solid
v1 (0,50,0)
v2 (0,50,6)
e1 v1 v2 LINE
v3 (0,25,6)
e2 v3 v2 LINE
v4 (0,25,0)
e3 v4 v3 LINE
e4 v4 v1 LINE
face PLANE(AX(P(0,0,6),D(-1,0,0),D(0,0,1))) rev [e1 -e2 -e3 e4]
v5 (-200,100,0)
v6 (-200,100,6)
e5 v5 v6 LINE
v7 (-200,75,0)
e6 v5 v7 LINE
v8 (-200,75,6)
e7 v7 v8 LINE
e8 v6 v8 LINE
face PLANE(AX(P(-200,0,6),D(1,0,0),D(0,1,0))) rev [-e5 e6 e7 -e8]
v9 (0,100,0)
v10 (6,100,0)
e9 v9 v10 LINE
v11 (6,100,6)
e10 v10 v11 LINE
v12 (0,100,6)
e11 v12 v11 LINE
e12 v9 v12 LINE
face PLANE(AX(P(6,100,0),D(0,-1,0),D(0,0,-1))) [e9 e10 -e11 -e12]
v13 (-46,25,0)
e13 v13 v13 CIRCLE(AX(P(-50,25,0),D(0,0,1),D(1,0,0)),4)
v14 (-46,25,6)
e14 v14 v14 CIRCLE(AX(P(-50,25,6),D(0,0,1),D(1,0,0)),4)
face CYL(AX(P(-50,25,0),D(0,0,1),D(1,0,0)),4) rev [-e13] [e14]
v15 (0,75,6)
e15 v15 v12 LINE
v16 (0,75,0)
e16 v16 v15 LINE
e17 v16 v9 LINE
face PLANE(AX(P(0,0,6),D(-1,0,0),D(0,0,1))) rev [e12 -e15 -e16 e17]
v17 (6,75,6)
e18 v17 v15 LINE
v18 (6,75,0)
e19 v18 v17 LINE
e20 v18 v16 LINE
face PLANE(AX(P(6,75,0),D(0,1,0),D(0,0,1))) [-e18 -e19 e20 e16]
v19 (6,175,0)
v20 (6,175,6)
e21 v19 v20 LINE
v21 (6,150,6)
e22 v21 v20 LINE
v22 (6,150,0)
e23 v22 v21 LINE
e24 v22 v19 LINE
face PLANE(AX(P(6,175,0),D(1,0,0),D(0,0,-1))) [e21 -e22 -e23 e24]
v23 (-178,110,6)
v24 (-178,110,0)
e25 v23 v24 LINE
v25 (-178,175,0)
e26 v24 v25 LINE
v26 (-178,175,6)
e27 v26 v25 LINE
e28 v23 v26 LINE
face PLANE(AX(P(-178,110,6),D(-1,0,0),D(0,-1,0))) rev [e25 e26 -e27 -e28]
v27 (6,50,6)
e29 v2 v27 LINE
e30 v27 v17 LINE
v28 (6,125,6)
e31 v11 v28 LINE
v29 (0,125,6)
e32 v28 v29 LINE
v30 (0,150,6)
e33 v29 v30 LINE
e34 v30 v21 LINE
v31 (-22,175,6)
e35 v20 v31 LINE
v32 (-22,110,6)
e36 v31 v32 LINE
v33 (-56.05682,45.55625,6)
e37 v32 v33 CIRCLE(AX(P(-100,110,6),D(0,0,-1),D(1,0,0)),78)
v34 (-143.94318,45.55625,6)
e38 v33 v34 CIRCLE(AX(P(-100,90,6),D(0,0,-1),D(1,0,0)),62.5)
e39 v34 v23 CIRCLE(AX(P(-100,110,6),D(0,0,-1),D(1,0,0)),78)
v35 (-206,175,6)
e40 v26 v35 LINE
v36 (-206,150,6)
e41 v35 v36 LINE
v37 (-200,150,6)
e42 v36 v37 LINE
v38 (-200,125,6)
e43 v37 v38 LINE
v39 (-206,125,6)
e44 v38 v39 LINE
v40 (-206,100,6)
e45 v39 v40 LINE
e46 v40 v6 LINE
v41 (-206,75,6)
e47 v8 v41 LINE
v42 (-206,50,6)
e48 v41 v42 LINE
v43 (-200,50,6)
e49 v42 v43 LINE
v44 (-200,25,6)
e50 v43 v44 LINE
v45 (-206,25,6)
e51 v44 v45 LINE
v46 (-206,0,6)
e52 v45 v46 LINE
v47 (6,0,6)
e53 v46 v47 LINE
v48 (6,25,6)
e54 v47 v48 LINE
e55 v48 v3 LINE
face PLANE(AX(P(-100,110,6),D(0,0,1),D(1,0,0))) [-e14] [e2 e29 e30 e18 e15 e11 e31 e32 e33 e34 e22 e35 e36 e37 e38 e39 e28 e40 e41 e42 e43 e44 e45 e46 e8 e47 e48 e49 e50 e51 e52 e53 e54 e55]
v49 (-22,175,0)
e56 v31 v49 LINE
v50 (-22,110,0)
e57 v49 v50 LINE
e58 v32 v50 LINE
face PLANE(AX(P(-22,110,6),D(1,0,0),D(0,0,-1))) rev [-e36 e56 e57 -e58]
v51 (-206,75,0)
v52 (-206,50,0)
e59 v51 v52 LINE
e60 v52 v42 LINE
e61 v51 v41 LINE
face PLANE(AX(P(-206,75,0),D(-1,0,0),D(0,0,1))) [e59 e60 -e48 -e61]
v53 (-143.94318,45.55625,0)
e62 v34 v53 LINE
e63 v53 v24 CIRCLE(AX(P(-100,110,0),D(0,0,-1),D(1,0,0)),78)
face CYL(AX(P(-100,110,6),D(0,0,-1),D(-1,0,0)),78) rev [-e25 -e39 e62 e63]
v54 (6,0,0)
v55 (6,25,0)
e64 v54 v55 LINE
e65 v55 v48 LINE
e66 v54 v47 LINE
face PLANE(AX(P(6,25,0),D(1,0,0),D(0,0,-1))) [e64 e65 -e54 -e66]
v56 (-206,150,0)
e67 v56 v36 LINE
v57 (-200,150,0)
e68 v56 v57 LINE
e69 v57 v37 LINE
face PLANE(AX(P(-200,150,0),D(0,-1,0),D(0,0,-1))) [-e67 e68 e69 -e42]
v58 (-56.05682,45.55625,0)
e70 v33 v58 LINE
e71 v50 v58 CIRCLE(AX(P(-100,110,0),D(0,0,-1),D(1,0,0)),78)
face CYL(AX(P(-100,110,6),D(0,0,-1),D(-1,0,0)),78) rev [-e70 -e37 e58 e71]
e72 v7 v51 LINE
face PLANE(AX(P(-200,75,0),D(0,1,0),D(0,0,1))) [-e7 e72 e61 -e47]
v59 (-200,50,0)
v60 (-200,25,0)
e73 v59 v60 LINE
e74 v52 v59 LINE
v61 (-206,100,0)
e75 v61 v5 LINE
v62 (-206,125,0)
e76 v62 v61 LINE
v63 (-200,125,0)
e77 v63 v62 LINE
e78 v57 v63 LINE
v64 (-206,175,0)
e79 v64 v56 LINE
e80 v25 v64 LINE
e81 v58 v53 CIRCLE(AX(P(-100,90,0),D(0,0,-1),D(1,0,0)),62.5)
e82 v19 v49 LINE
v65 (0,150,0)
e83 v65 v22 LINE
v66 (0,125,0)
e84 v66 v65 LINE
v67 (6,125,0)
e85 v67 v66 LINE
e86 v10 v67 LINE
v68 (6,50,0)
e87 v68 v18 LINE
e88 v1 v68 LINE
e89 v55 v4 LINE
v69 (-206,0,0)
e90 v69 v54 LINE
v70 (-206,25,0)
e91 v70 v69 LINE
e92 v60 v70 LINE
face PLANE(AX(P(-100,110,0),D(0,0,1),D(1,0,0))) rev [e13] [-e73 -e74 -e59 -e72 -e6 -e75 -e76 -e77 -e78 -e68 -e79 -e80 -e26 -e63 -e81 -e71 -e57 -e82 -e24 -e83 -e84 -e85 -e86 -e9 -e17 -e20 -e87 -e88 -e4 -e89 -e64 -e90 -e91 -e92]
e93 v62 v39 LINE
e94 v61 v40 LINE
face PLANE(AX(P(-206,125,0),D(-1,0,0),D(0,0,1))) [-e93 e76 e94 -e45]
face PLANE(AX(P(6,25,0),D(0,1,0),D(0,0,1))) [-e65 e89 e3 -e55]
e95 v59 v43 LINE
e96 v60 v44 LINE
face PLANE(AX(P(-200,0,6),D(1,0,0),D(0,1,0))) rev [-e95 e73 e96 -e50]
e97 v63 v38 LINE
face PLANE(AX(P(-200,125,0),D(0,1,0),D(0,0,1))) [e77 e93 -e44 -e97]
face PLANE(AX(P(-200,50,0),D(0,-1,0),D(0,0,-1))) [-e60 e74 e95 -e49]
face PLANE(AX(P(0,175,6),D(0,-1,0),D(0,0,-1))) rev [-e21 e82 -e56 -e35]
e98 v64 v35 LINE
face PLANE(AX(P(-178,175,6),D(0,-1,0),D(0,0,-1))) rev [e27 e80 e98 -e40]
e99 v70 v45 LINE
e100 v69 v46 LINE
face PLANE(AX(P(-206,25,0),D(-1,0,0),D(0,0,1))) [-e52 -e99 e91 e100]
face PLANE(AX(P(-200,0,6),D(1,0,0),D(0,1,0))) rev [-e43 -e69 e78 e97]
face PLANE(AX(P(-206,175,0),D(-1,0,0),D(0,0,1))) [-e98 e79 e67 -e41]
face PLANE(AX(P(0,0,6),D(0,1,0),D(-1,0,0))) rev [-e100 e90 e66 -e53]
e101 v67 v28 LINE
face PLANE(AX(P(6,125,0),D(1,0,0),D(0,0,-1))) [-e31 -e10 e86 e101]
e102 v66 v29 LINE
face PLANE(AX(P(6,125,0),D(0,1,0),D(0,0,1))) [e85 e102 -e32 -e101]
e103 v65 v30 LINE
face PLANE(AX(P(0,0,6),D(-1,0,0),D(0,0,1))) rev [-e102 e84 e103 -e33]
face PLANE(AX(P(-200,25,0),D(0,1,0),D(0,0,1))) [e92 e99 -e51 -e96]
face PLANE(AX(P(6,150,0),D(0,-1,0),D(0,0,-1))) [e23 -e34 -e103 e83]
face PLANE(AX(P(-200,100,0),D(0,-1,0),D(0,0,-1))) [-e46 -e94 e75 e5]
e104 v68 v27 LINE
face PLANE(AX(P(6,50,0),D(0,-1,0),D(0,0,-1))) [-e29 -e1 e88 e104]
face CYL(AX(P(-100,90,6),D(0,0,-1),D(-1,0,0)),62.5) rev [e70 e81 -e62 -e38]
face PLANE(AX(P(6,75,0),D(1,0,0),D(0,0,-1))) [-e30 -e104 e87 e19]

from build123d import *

# Parameters (mm, degrees)
BOSS_EXTRUDE1_DEPTH   = 6
SKETCH2_W             = 6
SKETCH2_H             = 25
BOSS_EXTRUDE2_DEPTH   = 6
LPATTERN1_OUTLINE_W   = 6
LPATTERN1_OUTLINE_H   = 6
LPATTERN1_DEPTH       = 25
LPATTERN1_START       = 50
LPATTERN1_2_OUTLINE_W = 6
LPATTERN1_2_OUTLINE_H = 6
LPATTERN1_2_DEPTH     = 25
LPATTERN1_START_2     = 100
LPATTERN1_3_OUTLINE_W = 6
LPATTERN1_3_OUTLINE_H = 6
LPATTERN1_3_DEPTH     = 25
LPATTERN1_START_3     = 150
LPATTERN1_4_OUTLINE_W = 6
LPATTERN1_4_OUTLINE_H = 6
LPATTERN1_4_DEPTH     = 25
SKETCH5_R             = 4
CUT_EXTRUDE1_DEPTH    = 271.364568685


# Read off the part's stored shape, not the designer's step: LPattern1
with BuildPart() as part:
    # Sketch1 → Boss-Extrude1 (new body)
    with BuildSketch(Plane.XY):
        with BuildLine():
            Line((-178, 175), (-200, 175))
            Line((-200, 175), (-200, 0))
            Line((-200, 0), (0, 0))
            Line((0, 0), (0, 175))
            Line((0, 175), (-22, 175))
            Line((-22, 175), (-22, 110))
            ThreePointArc((-22, 110), (-31.037807258, 73.555302549), (-56.056819802, 45.55625))
            ThreePointArc((-56.056819802, 45.55625), (-100, 27.5), (-143.943180198, 45.55625))
            ThreePointArc((-143.943180198, 45.55625), (-168.962192742, 73.555302549), (-178, 110))
            Line((-178, 110), (-178, 175))
        make_face()
    extrude(amount=BOSS_EXTRUDE1_DEPTH)

    # Sketch2 → Boss-Extrude2 (add)
    with BuildSketch(Plane.XY.offset(6)):
        with Locations((-203, 162.5)):
            Rectangle(SKETCH2_W, SKETCH2_H)
    extrude(amount=-BOSS_EXTRUDE2_DEPTH)

    # LPattern1 outline → LPattern1 (add)
    with BuildSketch(Plane(origin=(0, 0, 0), x_dir=(1, 0, 0), z_dir=(0, 1, 0))):
        with Locations((-203, -3)):
            Rectangle(LPATTERN1_OUTLINE_W, LPATTERN1_OUTLINE_H)
        with Locations((3, -3)):
            Rectangle(LPATTERN1_OUTLINE_W, LPATTERN1_OUTLINE_H)
    extrude(amount=LPATTERN1_DEPTH)

    # LPattern1 2 outline → LPattern1 2 (add)
    with BuildSketch(Plane(origin=(0, 0, 0), x_dir=(1, 0, 0), z_dir=(0, 1, 0)).offset(LPATTERN1_START)):
        with Locations((-203, -3)):
            Rectangle(LPATTERN1_2_OUTLINE_W, LPATTERN1_2_OUTLINE_H)
        with Locations((3, -3)):
            Rectangle(LPATTERN1_2_OUTLINE_W, LPATTERN1_2_OUTLINE_H)
    extrude(amount=LPATTERN1_2_DEPTH)

    # LPattern1 3 outline → LPattern1 3 (add)
    with BuildSketch(Plane(origin=(0, 0, 0), x_dir=(1, 0, 0), z_dir=(0, 1, 0)).offset(LPATTERN1_START_2)):
        with Locations((-203, -3)):
            Rectangle(LPATTERN1_3_OUTLINE_W, LPATTERN1_3_OUTLINE_H)
        with Locations((3, -3)):
            Rectangle(LPATTERN1_3_OUTLINE_W, LPATTERN1_3_OUTLINE_H)
    extrude(amount=LPATTERN1_3_DEPTH)

    # LPattern1 4 outline → LPattern1 4 (add)
    with BuildSketch(Plane(origin=(0, 0, 0), x_dir=(1, 0, 0), z_dir=(0, 1, 0)).offset(LPATTERN1_START_3)):
        with Locations((3, -3)):
            Rectangle(LPATTERN1_4_OUTLINE_W, LPATTERN1_4_OUTLINE_H)
    extrude(amount=LPATTERN1_4_DEPTH)

    # Sketch5 → Cut-Extrude1 (cut, through all)
    with BuildSketch(Plane.XY.offset(6)):
        with Locations((-50, 25)):
            Circle(SKETCH5_R)
    extrude(amount=-CUT_EXTRUDE1_DEPTH, mode=Mode.SUBTRACT)


solid = part.part
